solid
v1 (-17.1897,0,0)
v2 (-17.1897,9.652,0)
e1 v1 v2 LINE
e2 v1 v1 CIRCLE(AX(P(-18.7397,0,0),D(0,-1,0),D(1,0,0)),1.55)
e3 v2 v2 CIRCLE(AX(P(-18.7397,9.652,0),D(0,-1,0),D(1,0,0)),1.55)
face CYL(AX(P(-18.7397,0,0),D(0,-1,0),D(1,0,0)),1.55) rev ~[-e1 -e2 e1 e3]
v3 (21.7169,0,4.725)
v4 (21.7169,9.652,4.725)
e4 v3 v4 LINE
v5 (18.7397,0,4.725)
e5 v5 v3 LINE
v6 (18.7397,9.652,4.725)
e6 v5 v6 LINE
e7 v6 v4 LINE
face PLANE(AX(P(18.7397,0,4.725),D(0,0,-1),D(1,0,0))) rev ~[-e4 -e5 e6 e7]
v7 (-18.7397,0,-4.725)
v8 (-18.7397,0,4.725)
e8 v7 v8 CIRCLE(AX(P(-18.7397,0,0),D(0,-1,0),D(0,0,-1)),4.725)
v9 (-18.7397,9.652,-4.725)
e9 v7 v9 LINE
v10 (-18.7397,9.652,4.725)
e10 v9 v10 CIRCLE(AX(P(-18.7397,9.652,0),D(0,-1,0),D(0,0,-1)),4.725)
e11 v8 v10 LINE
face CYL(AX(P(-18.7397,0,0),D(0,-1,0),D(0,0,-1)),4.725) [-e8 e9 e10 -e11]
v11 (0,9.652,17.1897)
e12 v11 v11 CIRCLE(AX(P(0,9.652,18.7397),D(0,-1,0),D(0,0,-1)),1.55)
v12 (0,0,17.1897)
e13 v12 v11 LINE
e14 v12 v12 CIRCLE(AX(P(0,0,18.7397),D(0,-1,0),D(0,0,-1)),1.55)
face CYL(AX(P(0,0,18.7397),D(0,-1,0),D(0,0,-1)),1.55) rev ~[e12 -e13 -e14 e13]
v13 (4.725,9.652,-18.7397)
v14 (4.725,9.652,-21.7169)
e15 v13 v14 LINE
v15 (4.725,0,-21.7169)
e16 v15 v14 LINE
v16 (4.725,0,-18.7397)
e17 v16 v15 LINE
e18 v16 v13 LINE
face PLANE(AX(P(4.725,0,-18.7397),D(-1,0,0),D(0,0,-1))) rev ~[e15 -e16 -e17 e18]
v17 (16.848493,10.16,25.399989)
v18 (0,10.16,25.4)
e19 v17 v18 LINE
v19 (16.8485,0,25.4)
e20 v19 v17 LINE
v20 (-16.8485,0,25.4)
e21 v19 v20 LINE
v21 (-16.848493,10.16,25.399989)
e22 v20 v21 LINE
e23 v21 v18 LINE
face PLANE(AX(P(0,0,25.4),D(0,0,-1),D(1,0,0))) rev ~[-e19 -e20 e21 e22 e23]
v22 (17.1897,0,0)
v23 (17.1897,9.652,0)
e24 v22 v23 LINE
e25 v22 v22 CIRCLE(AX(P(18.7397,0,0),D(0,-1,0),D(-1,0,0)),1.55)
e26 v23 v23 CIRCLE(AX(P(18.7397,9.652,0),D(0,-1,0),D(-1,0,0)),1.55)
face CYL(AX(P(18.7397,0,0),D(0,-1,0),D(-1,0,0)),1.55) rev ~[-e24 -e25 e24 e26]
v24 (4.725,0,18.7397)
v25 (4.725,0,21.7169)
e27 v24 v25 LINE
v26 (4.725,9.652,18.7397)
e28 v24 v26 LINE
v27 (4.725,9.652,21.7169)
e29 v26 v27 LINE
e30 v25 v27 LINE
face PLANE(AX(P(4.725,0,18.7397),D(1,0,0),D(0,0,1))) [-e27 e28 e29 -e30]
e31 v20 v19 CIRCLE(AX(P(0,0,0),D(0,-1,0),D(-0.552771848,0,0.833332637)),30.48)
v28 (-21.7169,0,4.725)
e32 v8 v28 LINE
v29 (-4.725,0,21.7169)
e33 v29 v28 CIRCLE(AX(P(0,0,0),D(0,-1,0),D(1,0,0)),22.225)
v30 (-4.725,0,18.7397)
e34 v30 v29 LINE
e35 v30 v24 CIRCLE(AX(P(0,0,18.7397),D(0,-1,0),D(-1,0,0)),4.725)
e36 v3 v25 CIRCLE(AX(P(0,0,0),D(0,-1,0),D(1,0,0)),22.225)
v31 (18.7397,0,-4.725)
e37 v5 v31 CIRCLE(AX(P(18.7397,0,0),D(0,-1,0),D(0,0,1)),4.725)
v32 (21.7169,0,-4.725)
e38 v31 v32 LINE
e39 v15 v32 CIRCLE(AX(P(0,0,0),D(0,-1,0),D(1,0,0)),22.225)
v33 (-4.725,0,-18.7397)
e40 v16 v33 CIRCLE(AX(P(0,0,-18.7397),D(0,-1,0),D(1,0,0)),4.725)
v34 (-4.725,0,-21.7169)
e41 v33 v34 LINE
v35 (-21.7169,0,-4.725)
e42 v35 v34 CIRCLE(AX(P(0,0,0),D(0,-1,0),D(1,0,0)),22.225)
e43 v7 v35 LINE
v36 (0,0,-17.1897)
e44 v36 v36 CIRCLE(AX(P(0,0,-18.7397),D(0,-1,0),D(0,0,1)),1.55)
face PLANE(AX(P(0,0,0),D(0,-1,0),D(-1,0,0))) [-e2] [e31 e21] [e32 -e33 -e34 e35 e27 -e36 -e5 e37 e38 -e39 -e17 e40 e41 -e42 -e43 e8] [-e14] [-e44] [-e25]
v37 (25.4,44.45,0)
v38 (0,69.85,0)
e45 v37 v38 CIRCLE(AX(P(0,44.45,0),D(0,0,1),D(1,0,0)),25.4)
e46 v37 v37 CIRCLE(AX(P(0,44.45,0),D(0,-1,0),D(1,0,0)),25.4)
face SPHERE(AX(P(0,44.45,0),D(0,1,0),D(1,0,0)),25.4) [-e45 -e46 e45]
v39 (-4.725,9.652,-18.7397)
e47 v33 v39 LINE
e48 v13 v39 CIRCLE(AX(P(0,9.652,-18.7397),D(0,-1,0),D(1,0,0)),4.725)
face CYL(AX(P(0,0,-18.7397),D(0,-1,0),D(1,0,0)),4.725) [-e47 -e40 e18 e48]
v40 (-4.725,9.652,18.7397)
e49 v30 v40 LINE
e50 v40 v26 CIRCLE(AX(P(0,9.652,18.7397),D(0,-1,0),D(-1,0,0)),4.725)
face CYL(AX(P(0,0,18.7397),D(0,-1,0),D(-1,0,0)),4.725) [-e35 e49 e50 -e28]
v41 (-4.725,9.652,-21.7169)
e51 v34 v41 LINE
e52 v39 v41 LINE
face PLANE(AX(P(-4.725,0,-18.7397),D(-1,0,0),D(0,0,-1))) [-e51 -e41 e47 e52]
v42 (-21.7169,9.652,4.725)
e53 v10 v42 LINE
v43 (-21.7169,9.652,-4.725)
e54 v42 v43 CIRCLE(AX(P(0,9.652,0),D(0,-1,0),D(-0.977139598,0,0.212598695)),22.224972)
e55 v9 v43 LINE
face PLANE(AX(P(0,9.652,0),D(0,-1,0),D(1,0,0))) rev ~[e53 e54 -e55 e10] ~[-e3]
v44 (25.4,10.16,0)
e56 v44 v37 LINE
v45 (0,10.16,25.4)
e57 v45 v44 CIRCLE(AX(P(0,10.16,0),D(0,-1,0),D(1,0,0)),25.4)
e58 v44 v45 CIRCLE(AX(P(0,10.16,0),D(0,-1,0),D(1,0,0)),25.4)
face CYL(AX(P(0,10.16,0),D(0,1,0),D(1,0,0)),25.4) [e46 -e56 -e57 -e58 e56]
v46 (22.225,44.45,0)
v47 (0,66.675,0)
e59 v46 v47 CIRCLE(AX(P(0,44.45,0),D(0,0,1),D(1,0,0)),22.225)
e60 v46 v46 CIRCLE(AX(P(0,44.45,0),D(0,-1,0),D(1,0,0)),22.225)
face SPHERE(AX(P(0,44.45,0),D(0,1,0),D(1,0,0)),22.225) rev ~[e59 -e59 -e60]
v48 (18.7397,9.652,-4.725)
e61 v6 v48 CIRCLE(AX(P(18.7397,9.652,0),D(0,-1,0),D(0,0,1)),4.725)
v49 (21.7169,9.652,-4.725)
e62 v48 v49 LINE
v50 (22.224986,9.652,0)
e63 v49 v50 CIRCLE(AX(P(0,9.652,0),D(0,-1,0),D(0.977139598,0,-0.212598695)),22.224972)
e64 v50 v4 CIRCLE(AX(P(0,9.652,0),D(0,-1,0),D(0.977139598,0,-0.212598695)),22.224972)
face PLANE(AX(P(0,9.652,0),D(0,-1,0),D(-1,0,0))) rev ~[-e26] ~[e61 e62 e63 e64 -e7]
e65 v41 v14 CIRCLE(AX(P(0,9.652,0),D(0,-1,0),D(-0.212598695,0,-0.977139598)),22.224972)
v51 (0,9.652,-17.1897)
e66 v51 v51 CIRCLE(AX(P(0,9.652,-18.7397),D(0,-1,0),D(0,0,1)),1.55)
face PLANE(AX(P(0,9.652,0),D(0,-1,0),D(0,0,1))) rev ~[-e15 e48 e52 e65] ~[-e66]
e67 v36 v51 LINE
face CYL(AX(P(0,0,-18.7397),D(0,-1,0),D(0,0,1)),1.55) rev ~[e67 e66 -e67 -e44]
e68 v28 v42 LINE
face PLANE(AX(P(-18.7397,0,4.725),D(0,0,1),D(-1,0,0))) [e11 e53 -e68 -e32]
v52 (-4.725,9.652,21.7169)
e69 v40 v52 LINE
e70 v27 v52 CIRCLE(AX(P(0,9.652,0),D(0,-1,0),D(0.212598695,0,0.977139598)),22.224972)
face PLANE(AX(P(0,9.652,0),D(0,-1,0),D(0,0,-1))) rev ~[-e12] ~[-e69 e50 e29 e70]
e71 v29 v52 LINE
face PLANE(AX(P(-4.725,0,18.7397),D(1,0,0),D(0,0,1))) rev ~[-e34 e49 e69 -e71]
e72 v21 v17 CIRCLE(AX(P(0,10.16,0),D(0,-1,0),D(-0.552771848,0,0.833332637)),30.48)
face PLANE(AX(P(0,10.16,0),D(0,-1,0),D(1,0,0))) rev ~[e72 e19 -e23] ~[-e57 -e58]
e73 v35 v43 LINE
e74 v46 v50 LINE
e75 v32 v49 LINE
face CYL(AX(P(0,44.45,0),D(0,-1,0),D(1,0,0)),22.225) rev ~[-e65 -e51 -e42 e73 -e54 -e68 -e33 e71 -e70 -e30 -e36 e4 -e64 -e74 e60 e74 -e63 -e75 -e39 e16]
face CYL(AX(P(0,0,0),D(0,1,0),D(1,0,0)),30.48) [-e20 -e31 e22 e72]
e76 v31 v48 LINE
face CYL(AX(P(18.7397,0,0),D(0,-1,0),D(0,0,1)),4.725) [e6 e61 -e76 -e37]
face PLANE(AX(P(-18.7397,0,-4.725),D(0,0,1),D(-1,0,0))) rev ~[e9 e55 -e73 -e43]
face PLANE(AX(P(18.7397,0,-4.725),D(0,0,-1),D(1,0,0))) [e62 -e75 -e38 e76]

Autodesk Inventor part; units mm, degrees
ref_plane "YZ Plane" through (0, 0, 0) normal (1, 0, 0) x (0, 1, 0)
ref_plane "XZ Plane" through (0, 0, 0) normal (0, 1, 0) x (-1, 0, 0)
ref_plane "XY Plane" through (0, 0, 0) normal (0, 0, 1) x (1, 0, 0)
sketch "Sketch1" plane through (0, 0, 0) normal (0, 0, 1) x (1, 0, 0)
  line L0 (22.225, 0) -> (30.48, 0)
  line L1 (30.48, 0) -> (30.48, 10.16)
  line L2 (30.48, 10.16) -> (25.4, 10.16)
  line L3 (25.4, 10.16) -> (25.4, 44.45)
  line L4 (25.4, 44.45) -> (0, 44.45) construction
  line L5 (0, 10.16) -> (0, 0)
  arc A0 (25.4, 44.45) -> (0, 69.85) centre (0, 44.45) ccw
  line L6 (0, 66.675) -> (0, 69.85)
  arc A1 (22.225, 44.45) -> (0, 66.675) centre (0, 44.45) ccw
  line L7 (22.225, 44.45) -> (22.225, 0)
  line L8 (0, 66.675) -> (0, 0) construction
  line L9 (0, 0) -> (22.225, 0) construction
  dimension "d2" = 3.175
  dimension "d3" = 10.16
  dimension "d4" = 69.85
  dimension "d6" = 25.4
  dimension "d7" = 5.08
revolve "Revolution1" add sketch "Sketch1" angle 360 about axis through (0, 66.675, 0) along (0, -1, 0)
sketch "Sketch3" plane through (0, 0, 0) normal (0, -1, 0) x (1, 0, 0)
  circle A0 centre (0, 0) radius 25.4 construction
  circle A1 centre (0, 0) radius 30.48 projected
  line L0 (0, 25.4) -> (-16.8485, 25.4)
  line L1 (0, 25.4) -> (16.8485, 25.4)
  arc A2 (-16.8485, 25.4) -> (0, 30.48) centre (0, 0) ccw
extrude "Extrusion1" cut sketch "Sketch3" against normal up to next contours L1 L0 A1 picked at (-9.4832, 26.3286)
sketch "Sketch4" plane through (0, 0, 0) normal (0, -1, 0) x (1, 0, 0)
  arc A0 (-18.7397, -4.725) -> (-18.7397, 4.725) centre (-18.7397, 0) ccw
  circle A1 centre (-18.7397, 0) radius 1.55
  line L0 (-18.7397, 4.725) -> (-21.7169, 4.725)
  line L1 (-18.7397, -4.725) -> (-21.7169, -4.725)
  arc A2 (-21.7169, 4.725) -> (-21.7169, -4.725) centre (0, 0) ccw
  point P0 (0, 0)
  dimension "d13" = 3.1
  dimension "d14" = 3.175
extrude "Extrusion2" add sketch "Sketch4" against normal blind 9.652
pattern_circular "Circular Pattern1" count 4 over 360 about axis through (0, 27.305, 0) along (0, -1, 0) of "Extrusion2"
properties part number "led"
